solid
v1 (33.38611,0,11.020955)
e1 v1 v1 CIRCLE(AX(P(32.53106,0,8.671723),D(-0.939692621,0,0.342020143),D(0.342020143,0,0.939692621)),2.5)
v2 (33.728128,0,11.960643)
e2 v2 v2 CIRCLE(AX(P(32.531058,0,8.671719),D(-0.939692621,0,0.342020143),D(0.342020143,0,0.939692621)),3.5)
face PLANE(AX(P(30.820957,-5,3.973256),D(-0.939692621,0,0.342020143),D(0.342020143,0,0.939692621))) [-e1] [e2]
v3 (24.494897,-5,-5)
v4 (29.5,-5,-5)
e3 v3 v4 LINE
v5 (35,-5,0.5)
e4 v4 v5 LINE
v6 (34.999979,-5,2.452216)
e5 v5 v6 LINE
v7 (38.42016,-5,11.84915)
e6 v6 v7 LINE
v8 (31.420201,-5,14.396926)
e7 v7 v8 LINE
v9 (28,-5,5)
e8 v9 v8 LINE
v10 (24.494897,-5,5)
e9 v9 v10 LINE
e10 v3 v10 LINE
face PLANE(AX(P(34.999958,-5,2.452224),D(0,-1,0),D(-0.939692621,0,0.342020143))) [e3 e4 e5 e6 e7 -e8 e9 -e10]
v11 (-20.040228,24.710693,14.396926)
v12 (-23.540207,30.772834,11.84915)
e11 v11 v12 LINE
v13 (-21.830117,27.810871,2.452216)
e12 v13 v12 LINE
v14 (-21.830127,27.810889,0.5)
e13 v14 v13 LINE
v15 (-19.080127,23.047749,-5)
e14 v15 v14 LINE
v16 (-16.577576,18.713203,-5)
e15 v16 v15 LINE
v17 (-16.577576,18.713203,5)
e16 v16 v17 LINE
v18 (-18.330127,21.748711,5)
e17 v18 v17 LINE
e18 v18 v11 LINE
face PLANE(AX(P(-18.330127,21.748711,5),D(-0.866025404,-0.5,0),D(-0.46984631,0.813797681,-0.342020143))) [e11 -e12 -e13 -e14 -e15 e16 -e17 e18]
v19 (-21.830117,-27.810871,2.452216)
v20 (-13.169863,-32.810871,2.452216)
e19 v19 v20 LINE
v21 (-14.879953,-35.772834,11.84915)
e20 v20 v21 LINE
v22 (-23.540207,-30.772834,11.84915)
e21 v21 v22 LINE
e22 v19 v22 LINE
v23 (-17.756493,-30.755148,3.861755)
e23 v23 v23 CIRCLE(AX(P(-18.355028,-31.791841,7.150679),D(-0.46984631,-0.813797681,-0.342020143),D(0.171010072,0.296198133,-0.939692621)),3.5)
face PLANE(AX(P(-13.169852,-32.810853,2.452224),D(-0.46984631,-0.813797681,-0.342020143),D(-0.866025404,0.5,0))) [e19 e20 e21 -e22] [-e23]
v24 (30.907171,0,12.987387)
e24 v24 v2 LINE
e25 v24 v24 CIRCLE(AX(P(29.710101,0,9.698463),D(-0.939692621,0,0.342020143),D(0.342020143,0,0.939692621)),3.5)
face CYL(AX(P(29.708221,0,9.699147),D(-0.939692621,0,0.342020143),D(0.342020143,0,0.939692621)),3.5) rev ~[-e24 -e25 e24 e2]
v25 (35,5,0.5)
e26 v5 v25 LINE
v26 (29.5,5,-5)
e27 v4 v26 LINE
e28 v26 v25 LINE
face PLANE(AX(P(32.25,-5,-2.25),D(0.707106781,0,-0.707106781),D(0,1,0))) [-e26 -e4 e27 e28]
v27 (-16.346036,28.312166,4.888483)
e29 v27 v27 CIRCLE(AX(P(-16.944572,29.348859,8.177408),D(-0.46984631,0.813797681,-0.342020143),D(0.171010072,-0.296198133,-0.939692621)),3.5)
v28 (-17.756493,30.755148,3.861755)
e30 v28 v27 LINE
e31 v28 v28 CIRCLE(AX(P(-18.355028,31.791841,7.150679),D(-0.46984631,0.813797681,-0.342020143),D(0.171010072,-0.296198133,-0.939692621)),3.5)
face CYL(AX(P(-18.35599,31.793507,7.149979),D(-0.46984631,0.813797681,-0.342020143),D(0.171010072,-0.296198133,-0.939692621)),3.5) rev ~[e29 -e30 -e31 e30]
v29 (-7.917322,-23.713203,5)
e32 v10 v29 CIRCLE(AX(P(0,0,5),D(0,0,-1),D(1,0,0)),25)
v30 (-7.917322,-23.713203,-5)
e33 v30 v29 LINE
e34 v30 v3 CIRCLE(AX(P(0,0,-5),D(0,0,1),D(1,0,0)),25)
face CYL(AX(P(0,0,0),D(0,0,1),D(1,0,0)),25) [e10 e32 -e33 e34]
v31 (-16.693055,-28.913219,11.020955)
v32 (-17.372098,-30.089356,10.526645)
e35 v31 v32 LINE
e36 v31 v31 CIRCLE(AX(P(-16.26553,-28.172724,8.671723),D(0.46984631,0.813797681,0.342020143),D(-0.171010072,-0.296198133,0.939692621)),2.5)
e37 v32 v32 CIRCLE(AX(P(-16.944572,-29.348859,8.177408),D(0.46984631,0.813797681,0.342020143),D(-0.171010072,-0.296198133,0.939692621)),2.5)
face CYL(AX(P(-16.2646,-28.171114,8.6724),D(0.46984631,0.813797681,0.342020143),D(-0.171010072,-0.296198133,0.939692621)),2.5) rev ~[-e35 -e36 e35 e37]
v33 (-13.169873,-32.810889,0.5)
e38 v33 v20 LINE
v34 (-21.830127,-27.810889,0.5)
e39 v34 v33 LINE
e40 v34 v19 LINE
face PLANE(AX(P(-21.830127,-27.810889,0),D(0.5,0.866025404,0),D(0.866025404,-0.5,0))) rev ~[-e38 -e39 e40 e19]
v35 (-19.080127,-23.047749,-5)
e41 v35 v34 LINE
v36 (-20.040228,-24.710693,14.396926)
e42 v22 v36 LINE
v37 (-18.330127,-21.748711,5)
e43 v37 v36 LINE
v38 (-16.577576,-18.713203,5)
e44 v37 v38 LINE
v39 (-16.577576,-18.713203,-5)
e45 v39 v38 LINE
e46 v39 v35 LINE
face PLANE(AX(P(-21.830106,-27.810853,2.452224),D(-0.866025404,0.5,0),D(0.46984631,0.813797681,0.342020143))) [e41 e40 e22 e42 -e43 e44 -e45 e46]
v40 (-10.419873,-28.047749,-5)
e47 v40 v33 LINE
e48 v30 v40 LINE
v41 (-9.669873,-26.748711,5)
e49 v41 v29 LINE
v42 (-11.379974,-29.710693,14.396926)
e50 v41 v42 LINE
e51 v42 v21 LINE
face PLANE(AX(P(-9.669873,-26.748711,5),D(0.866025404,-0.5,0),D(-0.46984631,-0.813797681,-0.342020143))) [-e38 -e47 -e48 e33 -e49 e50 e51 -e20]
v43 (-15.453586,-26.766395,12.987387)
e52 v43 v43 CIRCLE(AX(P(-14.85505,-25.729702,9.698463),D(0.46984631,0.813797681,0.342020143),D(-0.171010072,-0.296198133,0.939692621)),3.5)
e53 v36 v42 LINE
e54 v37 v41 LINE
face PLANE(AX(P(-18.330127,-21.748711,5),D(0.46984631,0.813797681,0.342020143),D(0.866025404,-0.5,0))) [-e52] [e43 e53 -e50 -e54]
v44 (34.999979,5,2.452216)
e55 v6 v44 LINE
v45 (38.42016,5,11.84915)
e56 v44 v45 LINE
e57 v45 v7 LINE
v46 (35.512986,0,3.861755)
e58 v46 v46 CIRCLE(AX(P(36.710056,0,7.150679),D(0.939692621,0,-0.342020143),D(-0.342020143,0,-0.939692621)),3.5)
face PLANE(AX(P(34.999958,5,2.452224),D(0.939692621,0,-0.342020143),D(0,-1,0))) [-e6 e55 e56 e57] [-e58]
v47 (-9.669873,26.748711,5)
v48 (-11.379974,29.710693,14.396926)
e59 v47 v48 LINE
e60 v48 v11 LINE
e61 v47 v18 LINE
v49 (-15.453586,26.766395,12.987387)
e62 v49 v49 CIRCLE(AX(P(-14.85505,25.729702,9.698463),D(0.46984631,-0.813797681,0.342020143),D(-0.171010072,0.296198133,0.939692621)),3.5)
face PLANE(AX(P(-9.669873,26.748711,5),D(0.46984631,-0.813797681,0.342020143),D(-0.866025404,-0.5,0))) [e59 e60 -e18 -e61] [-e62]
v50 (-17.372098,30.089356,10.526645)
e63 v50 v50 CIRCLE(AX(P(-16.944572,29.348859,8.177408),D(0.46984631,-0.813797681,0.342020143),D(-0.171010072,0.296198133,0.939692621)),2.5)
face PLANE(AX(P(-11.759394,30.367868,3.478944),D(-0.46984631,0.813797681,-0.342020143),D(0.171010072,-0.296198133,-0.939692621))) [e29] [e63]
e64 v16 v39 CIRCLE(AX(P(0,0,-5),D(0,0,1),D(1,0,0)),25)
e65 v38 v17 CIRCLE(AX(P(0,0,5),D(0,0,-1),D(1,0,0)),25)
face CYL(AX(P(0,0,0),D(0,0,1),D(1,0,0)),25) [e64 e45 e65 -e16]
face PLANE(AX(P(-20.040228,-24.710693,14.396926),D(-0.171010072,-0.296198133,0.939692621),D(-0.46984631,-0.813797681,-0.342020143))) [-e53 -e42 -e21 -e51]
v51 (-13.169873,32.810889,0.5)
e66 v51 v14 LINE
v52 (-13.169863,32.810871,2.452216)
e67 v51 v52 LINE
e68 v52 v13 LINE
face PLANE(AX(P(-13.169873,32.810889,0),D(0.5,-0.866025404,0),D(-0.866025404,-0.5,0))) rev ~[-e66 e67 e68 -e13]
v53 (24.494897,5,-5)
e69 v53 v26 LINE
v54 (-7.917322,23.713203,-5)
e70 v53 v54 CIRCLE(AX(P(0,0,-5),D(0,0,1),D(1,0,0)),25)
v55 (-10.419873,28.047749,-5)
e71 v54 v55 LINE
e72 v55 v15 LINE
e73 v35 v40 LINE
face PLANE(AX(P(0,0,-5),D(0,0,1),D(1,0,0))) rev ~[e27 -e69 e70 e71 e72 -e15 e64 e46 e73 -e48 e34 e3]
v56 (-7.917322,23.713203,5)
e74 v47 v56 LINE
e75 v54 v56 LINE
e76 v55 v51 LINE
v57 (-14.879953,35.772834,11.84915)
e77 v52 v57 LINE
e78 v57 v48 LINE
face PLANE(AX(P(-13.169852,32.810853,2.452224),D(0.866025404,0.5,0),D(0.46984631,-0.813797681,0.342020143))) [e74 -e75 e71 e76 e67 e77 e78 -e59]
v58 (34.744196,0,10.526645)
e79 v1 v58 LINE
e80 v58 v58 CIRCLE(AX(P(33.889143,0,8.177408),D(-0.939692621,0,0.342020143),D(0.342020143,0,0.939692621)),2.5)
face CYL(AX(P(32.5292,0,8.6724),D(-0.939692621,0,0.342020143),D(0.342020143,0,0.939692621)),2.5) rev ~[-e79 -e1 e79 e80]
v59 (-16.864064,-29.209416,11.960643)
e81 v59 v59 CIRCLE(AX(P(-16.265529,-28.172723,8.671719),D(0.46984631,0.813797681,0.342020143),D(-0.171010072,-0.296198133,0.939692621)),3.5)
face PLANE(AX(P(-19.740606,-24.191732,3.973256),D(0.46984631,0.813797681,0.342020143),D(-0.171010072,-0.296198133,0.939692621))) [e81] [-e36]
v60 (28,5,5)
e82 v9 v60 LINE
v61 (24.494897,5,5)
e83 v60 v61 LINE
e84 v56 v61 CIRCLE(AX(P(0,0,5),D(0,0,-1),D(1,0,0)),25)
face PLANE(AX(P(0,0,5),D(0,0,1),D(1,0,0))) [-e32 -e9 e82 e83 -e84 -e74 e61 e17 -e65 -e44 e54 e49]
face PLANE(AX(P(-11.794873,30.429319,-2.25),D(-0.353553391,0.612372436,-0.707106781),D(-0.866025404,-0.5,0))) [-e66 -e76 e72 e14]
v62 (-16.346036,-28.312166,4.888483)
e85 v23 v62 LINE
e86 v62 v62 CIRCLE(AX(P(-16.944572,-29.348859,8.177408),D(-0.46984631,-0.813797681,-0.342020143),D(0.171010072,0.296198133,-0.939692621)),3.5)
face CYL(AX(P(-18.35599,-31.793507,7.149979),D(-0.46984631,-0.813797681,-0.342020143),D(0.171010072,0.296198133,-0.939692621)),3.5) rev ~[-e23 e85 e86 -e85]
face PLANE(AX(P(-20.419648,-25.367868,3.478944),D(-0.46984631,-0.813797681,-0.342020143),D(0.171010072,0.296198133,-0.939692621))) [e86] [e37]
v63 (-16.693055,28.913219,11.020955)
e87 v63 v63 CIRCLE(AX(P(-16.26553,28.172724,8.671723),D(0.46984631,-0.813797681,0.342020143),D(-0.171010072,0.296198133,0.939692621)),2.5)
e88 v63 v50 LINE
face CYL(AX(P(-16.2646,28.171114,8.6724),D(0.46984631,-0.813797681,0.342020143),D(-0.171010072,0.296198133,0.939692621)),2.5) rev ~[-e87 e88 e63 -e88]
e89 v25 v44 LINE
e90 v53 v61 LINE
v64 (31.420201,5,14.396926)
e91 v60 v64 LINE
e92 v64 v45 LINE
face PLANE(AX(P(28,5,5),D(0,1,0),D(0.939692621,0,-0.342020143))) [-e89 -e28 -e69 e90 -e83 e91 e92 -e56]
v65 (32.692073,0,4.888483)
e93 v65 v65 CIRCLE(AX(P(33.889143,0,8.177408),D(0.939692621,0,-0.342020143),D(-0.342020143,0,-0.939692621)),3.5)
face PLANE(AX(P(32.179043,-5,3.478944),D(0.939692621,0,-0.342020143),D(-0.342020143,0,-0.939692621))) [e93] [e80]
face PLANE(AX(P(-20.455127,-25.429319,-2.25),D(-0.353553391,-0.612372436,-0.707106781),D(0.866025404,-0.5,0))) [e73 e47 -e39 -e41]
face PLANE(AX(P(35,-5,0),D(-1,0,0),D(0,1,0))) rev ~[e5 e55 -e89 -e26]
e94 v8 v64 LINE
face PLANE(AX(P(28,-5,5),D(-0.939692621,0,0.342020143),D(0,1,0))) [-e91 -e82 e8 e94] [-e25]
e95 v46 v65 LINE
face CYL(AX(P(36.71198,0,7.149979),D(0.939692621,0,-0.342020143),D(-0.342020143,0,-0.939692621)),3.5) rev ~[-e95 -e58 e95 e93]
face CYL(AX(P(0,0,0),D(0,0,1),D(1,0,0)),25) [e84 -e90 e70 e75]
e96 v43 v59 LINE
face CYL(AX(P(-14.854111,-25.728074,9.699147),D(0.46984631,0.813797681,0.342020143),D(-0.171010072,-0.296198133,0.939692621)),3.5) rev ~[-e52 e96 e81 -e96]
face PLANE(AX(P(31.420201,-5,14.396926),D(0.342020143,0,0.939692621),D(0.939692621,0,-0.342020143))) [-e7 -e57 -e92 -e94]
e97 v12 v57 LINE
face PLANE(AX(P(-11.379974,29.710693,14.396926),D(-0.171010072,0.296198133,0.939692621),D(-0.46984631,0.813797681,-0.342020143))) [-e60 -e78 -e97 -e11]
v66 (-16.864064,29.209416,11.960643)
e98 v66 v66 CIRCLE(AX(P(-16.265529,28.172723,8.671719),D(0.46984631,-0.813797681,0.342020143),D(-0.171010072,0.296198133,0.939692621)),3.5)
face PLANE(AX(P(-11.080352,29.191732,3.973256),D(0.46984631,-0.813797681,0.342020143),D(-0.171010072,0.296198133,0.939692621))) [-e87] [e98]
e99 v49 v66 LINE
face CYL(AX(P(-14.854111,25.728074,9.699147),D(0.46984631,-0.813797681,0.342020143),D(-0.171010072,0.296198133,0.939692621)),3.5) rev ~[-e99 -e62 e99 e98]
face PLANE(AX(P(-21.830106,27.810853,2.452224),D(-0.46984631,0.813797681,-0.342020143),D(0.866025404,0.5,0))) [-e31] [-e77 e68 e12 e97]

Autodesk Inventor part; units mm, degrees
ref_plane "YZ Plane" through (0, 0, 0) normal (1, 0, 0) x (0, 1, 0)
ref_plane "XZ Plane" through (0, 0, 0) normal (0, 1, 0) x (-1, 0, 0)
ref_plane "XY Plane" through (0, 0, 0) normal (0, 0, 1) x (1, 0, 0)
sketch "Sketch1" plane through (0, 0, 0) normal (0, 0, 1) x (1, 0, 0)
  circle A0 centre (0, 0) radius 25
  line L0 (15, -5) -> (35, -5)
  line L1 (35, -5) -> (35, 5)
  line L2 (35, 5) -> (15, 5)
  line L3 (15, 5) -> (15, -5)
  line L4 (15, -5) -> (35, 5) construction
  line L5 (35, -5) -> (15, 5) construction
  point P0 (25, 0)
  dimension "d0" = 50
  dimension "d3" = 10
  dimension "d4" = 20
  dimension "d5" = 0
extrude "Extrusion1" add sketch "Sketch1" along normal mid plane 10 contours A0 L0 L3 L2 | L2 L3 L0 A0
extrude "Extrusion2" add sketch "Sketch1" along normal mid plane 10 contours A0 L0 L3 L2 | A0 L2 L1 L0 picked at (18.3333, 0)
chamfer "Chamfer1" distance 7 angle 20 1 edges at (35, 0, 5) measured on face at (6.5398, 14.4203, 5)
sketch "Sketch2" plane through (28, -5, 5) normal (0.3420201, 0, 0.9396926) x (0.9396926, 0, -0.3420201)
  line L0 (7.4492, 0) -> (0, 0)
  line L1 (0, 0) -> (0, 10)
  line L2 (0, 10) -> (7.4492, 10)
  line L3 (7.4492, 10) -> (7.4492, 0)
  line L4 (7.4492, 0) -> (0, 10) construction
  line L5 (0, 0) -> (7.4492, 10) construction
  line L6 (0, 10) -> (0, 0) projected
  line L7 (7.4492, 0) -> (7.4492, 10) projected
  line L8 (7.4492, 10) -> (0, 10) projected
  line L9 (0, 0) -> (7.4492, 0) projected
  point P0 (-24.6013, 5)
  point P1 (3.7246, 5)
  dimension "d11" = 0
  dimension "d12" = 0
  dimension "d13" = 0
  dimension "d14" = 0
extrude "Extrusion3" add sketch "Sketch2" along normal blind 10
sketch "Sketch3" plane through (28, -5, 5) normal (-0.9396926, 0, 0.3420201) x (0.3420201, 0, 0.9396926)
  circle A0 centre (5, 5) radius 3.5
  line L0 (10, 10) -> (10, 0) projected
  line L1 (0, 10) -> (0, 0) projected
  line L2 (0, 0) -> (10, 0) projected
  line L3 (0, 10) -> (10, 10) projected
  point P0 (-14.275, 5)
  dimension "d17" = 7
  dimension "d18" = 5
  dimension "d19" = 5
  dimension "d20" = 5
  dimension "d21" = 5
extrude "Extrusion5" cut sketch "Sketch3" against normal blind 3 contours A0
sketch "Sketch4" plane through (32.5292, 0, 8.6724) normal (-0.9396926, 0, 0.3420201) x (0.3420201, 0, 0.9396926)
  circle A0 centre (0, 0) radius 2.5
  circle A1 centre (0, 0) radius 3.5 projected
  point P0 (-19.275, 0)
  dimension "d32" = 5
extrude "Extrusion6" cut sketch "Sketch4" against normal through all contours A0
chamfer "Chamfer3" distance 5.5 angle 45 1 edges at (35, 0, -5)
sketch "Sketch5" plane through (35, -5, 2.4522) normal (0.9396926, 0, -0.3420201) x (-0.3420201, 0, -0.9396926)
  circle A0 centre (-5, 5) radius 3.5
  circle A1 centre (-5, 5) radius 2.5 projected
  point P0 (14.275, 5)
  dimension "d35" = 7
extrude "Extrusion7" cut sketch "Sketch5" against normal blind 3
pattern_circular "Circular Pattern1" count 3 over 360 about axis through (0, 0, 0) along (0, 0, 1) of "Extrusion3", "Extrusion2", "Chamfer1", "Extrusion5", "Extrusion6", "Extrusion7", "Chamfer3"
equation "\"d18\" = d19"
equation "\"d20\" = d21"
properties part number "BottomPlatform"
